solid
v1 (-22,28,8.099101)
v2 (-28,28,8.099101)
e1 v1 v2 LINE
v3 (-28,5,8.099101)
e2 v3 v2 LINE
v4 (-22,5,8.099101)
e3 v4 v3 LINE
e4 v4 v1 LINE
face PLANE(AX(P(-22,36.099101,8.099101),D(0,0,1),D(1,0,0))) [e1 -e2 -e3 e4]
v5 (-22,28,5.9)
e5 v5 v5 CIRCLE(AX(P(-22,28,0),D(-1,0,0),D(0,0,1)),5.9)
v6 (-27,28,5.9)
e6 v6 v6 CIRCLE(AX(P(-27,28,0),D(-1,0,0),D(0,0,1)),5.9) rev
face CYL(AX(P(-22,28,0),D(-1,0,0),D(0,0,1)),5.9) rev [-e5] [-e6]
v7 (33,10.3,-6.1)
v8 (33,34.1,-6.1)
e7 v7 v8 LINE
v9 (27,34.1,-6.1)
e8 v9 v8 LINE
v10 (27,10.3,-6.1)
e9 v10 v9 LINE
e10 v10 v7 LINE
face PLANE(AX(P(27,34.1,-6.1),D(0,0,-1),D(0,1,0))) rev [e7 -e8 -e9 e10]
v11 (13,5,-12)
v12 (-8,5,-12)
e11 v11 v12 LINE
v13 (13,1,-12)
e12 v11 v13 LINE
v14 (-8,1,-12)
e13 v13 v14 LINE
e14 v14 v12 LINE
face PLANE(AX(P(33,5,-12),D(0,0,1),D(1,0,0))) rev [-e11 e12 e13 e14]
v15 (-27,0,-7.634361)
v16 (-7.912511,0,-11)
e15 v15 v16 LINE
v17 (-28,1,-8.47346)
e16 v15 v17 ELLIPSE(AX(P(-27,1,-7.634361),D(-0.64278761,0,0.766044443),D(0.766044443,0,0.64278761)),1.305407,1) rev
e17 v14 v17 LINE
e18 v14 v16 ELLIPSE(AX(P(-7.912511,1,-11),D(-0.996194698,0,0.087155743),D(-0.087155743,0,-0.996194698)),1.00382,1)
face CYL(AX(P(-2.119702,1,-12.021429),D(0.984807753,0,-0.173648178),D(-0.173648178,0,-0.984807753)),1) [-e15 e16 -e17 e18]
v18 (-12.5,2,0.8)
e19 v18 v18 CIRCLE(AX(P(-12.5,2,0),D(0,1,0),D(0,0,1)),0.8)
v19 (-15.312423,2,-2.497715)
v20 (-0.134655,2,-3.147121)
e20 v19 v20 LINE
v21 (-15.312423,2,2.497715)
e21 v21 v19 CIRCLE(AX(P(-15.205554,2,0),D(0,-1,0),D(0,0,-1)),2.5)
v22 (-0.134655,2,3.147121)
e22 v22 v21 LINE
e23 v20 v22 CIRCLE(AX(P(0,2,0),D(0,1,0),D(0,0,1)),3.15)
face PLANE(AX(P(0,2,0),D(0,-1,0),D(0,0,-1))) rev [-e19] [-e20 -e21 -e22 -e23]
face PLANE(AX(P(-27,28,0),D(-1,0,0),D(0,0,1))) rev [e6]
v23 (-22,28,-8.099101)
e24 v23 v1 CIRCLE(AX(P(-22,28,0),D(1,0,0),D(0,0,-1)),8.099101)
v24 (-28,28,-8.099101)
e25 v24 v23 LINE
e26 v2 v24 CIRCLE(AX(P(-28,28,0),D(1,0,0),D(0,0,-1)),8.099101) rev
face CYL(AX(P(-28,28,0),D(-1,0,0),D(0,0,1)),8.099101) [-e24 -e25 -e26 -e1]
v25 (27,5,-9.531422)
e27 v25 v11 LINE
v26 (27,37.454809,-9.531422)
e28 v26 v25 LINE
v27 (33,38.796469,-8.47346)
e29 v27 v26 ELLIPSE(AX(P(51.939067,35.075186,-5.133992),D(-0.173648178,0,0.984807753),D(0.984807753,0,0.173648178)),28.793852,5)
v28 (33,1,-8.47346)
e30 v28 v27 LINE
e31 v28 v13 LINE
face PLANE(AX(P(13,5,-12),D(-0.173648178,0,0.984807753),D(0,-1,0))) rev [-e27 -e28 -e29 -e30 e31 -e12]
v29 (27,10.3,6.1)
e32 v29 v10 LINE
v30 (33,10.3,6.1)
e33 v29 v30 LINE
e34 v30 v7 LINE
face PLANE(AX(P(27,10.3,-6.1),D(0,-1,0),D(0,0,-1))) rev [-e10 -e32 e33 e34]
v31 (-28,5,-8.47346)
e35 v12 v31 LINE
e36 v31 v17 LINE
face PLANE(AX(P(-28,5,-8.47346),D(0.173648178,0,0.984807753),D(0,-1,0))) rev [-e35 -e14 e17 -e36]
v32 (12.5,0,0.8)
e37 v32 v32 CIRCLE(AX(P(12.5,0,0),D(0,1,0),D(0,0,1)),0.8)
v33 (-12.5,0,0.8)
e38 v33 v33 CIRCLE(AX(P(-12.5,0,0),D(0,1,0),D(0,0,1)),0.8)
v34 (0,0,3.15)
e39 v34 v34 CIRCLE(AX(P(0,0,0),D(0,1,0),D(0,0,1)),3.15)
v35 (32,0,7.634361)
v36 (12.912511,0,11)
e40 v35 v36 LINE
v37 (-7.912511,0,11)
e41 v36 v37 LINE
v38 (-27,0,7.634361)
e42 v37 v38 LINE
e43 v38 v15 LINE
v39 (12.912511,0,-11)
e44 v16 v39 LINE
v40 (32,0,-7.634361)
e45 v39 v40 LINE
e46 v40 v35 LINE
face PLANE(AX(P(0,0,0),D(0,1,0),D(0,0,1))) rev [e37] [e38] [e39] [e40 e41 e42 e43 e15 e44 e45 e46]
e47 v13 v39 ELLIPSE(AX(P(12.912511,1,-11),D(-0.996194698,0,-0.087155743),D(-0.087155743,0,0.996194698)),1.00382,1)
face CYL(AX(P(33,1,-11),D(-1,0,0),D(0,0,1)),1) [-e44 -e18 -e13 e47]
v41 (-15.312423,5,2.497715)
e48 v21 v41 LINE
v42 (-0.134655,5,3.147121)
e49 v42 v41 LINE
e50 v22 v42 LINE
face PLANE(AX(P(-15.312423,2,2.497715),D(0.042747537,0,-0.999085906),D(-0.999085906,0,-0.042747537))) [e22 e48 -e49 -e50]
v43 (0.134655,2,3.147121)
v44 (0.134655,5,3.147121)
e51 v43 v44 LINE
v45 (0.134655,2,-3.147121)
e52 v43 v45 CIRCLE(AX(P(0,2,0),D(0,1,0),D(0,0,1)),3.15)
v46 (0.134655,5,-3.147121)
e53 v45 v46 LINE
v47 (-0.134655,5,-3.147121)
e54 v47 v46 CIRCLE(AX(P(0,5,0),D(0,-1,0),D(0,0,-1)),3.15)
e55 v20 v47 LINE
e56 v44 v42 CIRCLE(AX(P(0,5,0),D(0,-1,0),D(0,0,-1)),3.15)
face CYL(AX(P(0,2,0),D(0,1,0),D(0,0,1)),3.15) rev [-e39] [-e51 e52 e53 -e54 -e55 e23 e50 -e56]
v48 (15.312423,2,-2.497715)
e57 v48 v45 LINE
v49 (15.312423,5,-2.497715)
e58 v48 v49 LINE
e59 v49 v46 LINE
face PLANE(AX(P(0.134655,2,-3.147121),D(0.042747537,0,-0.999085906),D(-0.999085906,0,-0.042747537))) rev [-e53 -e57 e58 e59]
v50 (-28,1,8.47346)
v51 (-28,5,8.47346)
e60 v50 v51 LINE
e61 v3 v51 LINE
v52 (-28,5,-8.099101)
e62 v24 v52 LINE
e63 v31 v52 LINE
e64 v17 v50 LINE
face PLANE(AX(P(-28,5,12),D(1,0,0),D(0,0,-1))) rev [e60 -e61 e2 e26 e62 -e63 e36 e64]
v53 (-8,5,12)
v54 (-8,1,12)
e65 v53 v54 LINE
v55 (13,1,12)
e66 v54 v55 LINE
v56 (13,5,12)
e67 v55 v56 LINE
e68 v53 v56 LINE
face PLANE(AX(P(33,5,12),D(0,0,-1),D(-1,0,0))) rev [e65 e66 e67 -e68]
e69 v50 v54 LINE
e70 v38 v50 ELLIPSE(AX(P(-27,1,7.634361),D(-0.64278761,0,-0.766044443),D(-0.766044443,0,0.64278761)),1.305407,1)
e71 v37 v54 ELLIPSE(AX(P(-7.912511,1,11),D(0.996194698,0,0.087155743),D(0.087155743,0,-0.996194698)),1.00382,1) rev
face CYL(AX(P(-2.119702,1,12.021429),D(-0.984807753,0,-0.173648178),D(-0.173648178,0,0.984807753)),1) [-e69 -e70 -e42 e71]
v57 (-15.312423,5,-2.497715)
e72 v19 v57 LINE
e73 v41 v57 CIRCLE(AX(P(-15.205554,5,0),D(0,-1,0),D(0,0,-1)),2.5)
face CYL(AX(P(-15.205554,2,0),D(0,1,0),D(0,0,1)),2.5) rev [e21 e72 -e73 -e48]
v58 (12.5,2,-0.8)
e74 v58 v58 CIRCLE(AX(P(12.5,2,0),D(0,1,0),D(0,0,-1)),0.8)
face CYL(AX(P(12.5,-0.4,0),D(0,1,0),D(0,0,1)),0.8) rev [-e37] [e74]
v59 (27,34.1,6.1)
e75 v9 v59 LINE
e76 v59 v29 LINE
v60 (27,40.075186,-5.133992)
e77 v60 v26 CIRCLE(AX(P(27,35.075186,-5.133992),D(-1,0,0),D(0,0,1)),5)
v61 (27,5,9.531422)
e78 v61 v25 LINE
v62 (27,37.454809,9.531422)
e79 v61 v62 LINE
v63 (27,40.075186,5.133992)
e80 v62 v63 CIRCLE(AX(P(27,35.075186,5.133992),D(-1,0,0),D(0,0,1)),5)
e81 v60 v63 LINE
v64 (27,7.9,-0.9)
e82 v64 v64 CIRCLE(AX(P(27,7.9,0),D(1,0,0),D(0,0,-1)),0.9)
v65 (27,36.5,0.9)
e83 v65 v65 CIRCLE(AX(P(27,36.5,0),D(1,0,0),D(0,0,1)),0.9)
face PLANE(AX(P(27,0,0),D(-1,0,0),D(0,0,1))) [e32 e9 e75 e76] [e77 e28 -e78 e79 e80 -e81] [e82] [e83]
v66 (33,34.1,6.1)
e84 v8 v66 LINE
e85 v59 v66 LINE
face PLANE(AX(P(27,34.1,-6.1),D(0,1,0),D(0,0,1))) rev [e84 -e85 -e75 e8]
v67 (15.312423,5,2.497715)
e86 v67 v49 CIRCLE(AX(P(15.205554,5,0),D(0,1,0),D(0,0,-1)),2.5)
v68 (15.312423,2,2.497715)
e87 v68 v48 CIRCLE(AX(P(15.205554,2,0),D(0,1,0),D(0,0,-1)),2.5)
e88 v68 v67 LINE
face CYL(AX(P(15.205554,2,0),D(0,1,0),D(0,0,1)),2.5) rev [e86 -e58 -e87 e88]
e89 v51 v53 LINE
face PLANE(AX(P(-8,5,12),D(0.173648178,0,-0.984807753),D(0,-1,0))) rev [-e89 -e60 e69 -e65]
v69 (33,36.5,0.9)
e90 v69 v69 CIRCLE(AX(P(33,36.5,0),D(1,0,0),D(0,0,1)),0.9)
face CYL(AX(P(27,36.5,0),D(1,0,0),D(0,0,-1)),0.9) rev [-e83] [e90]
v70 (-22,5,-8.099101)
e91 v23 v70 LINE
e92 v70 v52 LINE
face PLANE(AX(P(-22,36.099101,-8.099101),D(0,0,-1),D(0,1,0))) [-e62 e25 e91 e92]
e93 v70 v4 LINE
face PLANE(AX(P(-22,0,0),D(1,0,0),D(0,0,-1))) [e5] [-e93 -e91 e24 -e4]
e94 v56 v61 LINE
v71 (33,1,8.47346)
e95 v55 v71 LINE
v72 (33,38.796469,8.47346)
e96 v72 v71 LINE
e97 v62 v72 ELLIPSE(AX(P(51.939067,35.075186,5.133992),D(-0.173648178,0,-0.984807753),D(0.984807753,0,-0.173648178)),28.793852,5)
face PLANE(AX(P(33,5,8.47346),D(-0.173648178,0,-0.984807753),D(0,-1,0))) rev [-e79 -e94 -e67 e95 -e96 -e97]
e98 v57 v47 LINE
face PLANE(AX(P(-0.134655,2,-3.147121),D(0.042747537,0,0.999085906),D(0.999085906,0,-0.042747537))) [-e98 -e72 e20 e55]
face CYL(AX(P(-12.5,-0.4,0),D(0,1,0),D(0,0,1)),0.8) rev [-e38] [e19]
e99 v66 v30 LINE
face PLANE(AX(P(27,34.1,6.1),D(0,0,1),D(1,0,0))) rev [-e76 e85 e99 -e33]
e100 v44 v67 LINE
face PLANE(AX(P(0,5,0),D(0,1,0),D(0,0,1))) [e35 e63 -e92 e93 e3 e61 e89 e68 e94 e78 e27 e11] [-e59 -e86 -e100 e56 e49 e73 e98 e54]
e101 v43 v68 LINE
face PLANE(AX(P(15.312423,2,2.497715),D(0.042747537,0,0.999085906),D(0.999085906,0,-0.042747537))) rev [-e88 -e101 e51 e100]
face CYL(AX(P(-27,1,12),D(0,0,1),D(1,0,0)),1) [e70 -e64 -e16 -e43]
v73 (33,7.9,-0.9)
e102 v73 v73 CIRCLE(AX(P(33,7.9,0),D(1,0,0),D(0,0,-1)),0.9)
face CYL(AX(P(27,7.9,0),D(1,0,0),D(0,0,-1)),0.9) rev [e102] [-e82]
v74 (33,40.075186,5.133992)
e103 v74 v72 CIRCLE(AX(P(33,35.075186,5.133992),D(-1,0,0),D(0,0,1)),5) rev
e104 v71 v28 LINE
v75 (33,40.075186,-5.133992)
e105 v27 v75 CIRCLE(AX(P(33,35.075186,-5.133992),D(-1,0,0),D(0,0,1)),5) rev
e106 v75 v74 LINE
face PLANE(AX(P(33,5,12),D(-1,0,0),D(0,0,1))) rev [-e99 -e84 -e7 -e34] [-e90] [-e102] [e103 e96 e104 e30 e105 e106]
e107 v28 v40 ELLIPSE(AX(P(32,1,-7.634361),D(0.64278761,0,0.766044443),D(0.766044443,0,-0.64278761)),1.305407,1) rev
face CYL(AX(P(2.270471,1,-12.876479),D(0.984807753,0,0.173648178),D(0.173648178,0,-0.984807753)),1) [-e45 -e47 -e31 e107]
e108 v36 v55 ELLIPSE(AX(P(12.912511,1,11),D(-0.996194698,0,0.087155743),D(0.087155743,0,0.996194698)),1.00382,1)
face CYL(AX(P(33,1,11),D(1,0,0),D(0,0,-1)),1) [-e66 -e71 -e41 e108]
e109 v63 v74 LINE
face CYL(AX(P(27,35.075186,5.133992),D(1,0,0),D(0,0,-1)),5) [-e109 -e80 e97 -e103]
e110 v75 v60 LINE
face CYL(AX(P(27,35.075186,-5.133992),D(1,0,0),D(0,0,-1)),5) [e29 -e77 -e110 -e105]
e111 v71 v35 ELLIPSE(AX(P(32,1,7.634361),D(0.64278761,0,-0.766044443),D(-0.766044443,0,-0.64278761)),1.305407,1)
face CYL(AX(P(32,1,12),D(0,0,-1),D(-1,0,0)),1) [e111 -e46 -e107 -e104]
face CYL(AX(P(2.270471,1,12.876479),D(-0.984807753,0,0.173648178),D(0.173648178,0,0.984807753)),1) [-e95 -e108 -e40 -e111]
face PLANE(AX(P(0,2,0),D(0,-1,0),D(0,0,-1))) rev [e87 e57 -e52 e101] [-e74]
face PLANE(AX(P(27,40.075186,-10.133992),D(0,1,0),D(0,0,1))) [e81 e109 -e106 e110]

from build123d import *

# Parameters (mm, degrees)
SKETCH_1_W          = 61
SKETCH_1_H          = 24
EXTRUDE_1_DEPTH     = 5
SKETCH_2_W          = 16.198202564
SKETCH_2_H          = 31.099101282
SKETCH_2_R          = 5.9
EXTRUDE_2_DEPTH     = 6
SKETCH_8_R          = 5.9
EXTRUDE_4_DEPTH     = 1
FILLET_1_RADIUS     = 8.099101282
FILLET_1_LENGTH     = 6
SKETCH_3_W          = 20.26798367
SKETCH_3_H          = 35.075185683
SKETCH_3_R          = 0.9
SKETCH_3_W_2        = 12.2
SKETCH_3_H_2        = 23.8
EXTRUDE_3_DEPTH     = 6
FILLET_2_R          = 5
CHAMFER_1_SIZE      = 3.526539614
CHAMFER_1_SIZE_2    = 20
FILLET_4_R          = 1
CUT_EXTRUDE_1_DEPTH = 3
SKETCH_5_R          = 3.15
SKETCH_5_R_2        = 0.8
CUT_EXTRUDE_2_DEPTH = 2.4


with BuildPart() as part:
    # 草图1 → 凸台-拉伸1 (new body)
    with BuildSketch(Plane(origin=(0, 0, 0), x_dir=(1, 0, 0), z_dir=(0, 1, 0))):
        with Locations((2.5, 0)):
            Rectangle(SKETCH_1_W, SKETCH_1_H)
    extrude(amount=EXTRUDE_1_DEPTH)

    # 草图2 → 凸台-拉伸2 (add)
    with BuildSketch(Plane.ZY.offset(28)):
        with Locations((0, 20.549550641)):
            Rectangle(SKETCH_2_W, SKETCH_2_H)
        with Locations((0, 28)):
            Circle(SKETCH_2_R, mode=Mode.SUBTRACT)
    extrude(amount=-EXTRUDE_2_DEPTH)

    # 草图8 → 凸台-拉伸4 (add)
    with BuildSketch(Plane.ZY.offset(28)):
        with Locations((0, 28)):
            Circle(SKETCH_8_R)
    extrude(amount=-EXTRUDE_4_DEPTH)

    # 圆角1: full round fillet: the end face becomes a half cylinder, R = half its width
    fillet_1_face = Plane((-25, 36.099101282, 0), x_dir=(-1, 0, 0), z_dir=(0, 1, 0))  # on the end face: x along it, z out of the body
    fillet_1_slab = fillet_1_face.offset(-FILLET_1_RADIUS / 2) * Box(FILLET_1_LENGTH, 2 * FILLET_1_RADIUS, FILLET_1_RADIUS, mode=Mode.PRIVATE)  # the body's end, R deep
    fillet_1_round = Plane((-25, 28, 0), x_dir=(0, 1, 0), z_dir=(-1, 0, 0)) * Cylinder(FILLET_1_RADIUS, FILLET_1_LENGTH, mode=Mode.PRIVATE)  # its axis R under the face
    add(fillet_1_slab - fillet_1_round, mode=Mode.SUBTRACT)

    # 草图3 → 凸台-拉伸3 (add)
    with BuildSketch(Plane(origin=(33, 0, 0), x_dir=(0, 0, -1), z_dir=(1, 0, 0))):
        with Locations((0, 22.537592842)):
            Rectangle(SKETCH_3_W, SKETCH_3_H)
        with Locations((0, 7.9)):
            Circle(SKETCH_3_R, mode=Mode.SUBTRACT)
        with Locations(Location((0, 36.5, 0), (0, 0, 180))):
            Circle(SKETCH_3_R, mode=Mode.SUBTRACT)
        with Locations((0, 22.2)):
            Rectangle(SKETCH_3_W_2, SKETCH_3_H_2, mode=Mode.SUBTRACT)
    extrude(amount=-EXTRUDE_3_DEPTH)

    # 圆角2
    fillet_2_edges = [part.edges().sort_by_distance(p)[0] for p in [
        (30, 40.075185683, 10.133991835),
        (30, 40.075185683, -10.133991835),
    ]]
    fillet(fillet_2_edges, radius=FILLET_2_R)

    # 倒角1
    # the kernel refuses this chamfer: 20, 3.526539614 mm, written as the material it takes off along each edge
    with BuildSketch(Plane(origin=(33, -51.970775928, -12), x_dir=(0.21013876076743143, 0, 0.9776715712462587), z_dir=(0, 1, 0))) as chamfer_1_piece_1:
        Polygon((CHAMFER_1_SIZE * 0.977671571293, -CHAMFER_1_SIZE * 0.210138760778), (-CHAMFER_1_SIZE_2 * 0.210138760767, -CHAMFER_1_SIZE_2 * 0.977671571246), (0, 0), align=None)
    extrude(amount=108.941551857, mode=Mode.SUBTRACT)
    with BuildSketch(Plane(origin=(-28, -51.970775928, -12), x_dir=(0.9999776716360547, 0, -0.006682531656102014), z_dir=(0, 1, 0))) as chamfer_1_piece_2:
        Polygon((CHAMFER_1_SIZE_2 * 0.999977671636, -CHAMFER_1_SIZE_2 * 0.0066825316561), (-CHAMFER_1_SIZE * 0.00668253165642, -CHAMFER_1_SIZE * 0.999977671684), (0, 0), align=None)
    extrude(amount=108.941551857, mode=Mode.SUBTRACT)
    with BuildSketch(Plane(origin=(33, -51.970775928, 12), x_dir=(0.21013876076743124, 0, -0.9776715712462587), z_dir=(0, 1, 0))) as chamfer_1_piece_3:
        Polygon((CHAMFER_1_SIZE * 0.977671571293, CHAMFER_1_SIZE * 0.210138760778), (-CHAMFER_1_SIZE_2 * 0.210138760767, CHAMFER_1_SIZE_2 * 0.977671571246), (0, 0), align=None)
    extrude(amount=108.941551857, mode=Mode.SUBTRACT)
    with BuildSketch(Plane(origin=(-28, -51.970775928, 12), x_dir=(0.9999776716360547, 0, 0.006682531656101331), z_dir=(0, 1, 0))) as chamfer_1_piece_4:
        Polygon((CHAMFER_1_SIZE_2 * 0.999977671636, CHAMFER_1_SIZE_2 * 0.0066825316561), (-CHAMFER_1_SIZE * 0.00668253165642, CHAMFER_1_SIZE * 0.999977671684), (0, 0), align=None)
    extrude(amount=108.941551857, mode=Mode.SUBTRACT)

    # 圆角4
    fillet_4_edges = [part.edges().sort_by_distance(p)[0] for p in [
        (2.5, 0, -12),
        (-28, 0, 0),
        (33, 0, 0),
        (2.5, 0, 12),
        (-18, 0, -10.236730193),
        (-18, 0, 10.236730193),
        (23, 0, 10.236730193),
        (23, 0, -10.236730193),
    ]]
    fillet(fillet_4_edges, radius=FILLET_4_R)

    # 草图4 → 切除-拉伸1 (cut)
    with BuildSketch(Plane(origin=(-24, 5, 6), x_dir=(-1, 0, 0), z_dir=(0, -1, 0))):
        with BuildLine():
            Line((-23.865345259, 9.147120605), (-8.68757668, 8.497714766))
            ThreePointArc((-8.68757668, 8.497714766), (-6.294445522, 6), (-8.68757668, 3.502285234))
            Line((-8.68757668, 3.502285234), (-23.865345259, 2.852879395))
            ThreePointArc((-23.865345259, 2.852879395), (-27.15, 6), (-23.865345259, 9.147120605))
        make_face()
    cut_extrude_1 = extrude(amount=CUT_EXTRUDE_1_DEPTH, mode=Mode.SUBTRACT)

    # 镜向1: 切除-拉伸1 across plane
    add(cut_extrude_1.mirror(Plane(origin=(0, 0, 0), x_dir=(0, 0, 1), z_dir=(1, 0, 0))), mode=Mode.SUBTRACT)

    # 草图5 → 切除-拉伸2 (cut)
    with BuildSketch(Plane(origin=(0, 2, 0), x_dir=(1, 0, 0), z_dir=(0, 1, 0))):
        with Locations(Location((0, 0, 0), (0, 0, 270))):
            Circle(SKETCH_5_R)
        with Locations(Location((-12.5, 0, 0), (0, 0, 270))):
            Circle(SKETCH_5_R_2)
        with Locations(Location((12.5, 0, 0), (0, 0, 270))):
            Circle(SKETCH_5_R_2)
    extrude(amount=-CUT_EXTRUDE_2_DEPTH, mode=Mode.SUBTRACT)


solid = part.part
